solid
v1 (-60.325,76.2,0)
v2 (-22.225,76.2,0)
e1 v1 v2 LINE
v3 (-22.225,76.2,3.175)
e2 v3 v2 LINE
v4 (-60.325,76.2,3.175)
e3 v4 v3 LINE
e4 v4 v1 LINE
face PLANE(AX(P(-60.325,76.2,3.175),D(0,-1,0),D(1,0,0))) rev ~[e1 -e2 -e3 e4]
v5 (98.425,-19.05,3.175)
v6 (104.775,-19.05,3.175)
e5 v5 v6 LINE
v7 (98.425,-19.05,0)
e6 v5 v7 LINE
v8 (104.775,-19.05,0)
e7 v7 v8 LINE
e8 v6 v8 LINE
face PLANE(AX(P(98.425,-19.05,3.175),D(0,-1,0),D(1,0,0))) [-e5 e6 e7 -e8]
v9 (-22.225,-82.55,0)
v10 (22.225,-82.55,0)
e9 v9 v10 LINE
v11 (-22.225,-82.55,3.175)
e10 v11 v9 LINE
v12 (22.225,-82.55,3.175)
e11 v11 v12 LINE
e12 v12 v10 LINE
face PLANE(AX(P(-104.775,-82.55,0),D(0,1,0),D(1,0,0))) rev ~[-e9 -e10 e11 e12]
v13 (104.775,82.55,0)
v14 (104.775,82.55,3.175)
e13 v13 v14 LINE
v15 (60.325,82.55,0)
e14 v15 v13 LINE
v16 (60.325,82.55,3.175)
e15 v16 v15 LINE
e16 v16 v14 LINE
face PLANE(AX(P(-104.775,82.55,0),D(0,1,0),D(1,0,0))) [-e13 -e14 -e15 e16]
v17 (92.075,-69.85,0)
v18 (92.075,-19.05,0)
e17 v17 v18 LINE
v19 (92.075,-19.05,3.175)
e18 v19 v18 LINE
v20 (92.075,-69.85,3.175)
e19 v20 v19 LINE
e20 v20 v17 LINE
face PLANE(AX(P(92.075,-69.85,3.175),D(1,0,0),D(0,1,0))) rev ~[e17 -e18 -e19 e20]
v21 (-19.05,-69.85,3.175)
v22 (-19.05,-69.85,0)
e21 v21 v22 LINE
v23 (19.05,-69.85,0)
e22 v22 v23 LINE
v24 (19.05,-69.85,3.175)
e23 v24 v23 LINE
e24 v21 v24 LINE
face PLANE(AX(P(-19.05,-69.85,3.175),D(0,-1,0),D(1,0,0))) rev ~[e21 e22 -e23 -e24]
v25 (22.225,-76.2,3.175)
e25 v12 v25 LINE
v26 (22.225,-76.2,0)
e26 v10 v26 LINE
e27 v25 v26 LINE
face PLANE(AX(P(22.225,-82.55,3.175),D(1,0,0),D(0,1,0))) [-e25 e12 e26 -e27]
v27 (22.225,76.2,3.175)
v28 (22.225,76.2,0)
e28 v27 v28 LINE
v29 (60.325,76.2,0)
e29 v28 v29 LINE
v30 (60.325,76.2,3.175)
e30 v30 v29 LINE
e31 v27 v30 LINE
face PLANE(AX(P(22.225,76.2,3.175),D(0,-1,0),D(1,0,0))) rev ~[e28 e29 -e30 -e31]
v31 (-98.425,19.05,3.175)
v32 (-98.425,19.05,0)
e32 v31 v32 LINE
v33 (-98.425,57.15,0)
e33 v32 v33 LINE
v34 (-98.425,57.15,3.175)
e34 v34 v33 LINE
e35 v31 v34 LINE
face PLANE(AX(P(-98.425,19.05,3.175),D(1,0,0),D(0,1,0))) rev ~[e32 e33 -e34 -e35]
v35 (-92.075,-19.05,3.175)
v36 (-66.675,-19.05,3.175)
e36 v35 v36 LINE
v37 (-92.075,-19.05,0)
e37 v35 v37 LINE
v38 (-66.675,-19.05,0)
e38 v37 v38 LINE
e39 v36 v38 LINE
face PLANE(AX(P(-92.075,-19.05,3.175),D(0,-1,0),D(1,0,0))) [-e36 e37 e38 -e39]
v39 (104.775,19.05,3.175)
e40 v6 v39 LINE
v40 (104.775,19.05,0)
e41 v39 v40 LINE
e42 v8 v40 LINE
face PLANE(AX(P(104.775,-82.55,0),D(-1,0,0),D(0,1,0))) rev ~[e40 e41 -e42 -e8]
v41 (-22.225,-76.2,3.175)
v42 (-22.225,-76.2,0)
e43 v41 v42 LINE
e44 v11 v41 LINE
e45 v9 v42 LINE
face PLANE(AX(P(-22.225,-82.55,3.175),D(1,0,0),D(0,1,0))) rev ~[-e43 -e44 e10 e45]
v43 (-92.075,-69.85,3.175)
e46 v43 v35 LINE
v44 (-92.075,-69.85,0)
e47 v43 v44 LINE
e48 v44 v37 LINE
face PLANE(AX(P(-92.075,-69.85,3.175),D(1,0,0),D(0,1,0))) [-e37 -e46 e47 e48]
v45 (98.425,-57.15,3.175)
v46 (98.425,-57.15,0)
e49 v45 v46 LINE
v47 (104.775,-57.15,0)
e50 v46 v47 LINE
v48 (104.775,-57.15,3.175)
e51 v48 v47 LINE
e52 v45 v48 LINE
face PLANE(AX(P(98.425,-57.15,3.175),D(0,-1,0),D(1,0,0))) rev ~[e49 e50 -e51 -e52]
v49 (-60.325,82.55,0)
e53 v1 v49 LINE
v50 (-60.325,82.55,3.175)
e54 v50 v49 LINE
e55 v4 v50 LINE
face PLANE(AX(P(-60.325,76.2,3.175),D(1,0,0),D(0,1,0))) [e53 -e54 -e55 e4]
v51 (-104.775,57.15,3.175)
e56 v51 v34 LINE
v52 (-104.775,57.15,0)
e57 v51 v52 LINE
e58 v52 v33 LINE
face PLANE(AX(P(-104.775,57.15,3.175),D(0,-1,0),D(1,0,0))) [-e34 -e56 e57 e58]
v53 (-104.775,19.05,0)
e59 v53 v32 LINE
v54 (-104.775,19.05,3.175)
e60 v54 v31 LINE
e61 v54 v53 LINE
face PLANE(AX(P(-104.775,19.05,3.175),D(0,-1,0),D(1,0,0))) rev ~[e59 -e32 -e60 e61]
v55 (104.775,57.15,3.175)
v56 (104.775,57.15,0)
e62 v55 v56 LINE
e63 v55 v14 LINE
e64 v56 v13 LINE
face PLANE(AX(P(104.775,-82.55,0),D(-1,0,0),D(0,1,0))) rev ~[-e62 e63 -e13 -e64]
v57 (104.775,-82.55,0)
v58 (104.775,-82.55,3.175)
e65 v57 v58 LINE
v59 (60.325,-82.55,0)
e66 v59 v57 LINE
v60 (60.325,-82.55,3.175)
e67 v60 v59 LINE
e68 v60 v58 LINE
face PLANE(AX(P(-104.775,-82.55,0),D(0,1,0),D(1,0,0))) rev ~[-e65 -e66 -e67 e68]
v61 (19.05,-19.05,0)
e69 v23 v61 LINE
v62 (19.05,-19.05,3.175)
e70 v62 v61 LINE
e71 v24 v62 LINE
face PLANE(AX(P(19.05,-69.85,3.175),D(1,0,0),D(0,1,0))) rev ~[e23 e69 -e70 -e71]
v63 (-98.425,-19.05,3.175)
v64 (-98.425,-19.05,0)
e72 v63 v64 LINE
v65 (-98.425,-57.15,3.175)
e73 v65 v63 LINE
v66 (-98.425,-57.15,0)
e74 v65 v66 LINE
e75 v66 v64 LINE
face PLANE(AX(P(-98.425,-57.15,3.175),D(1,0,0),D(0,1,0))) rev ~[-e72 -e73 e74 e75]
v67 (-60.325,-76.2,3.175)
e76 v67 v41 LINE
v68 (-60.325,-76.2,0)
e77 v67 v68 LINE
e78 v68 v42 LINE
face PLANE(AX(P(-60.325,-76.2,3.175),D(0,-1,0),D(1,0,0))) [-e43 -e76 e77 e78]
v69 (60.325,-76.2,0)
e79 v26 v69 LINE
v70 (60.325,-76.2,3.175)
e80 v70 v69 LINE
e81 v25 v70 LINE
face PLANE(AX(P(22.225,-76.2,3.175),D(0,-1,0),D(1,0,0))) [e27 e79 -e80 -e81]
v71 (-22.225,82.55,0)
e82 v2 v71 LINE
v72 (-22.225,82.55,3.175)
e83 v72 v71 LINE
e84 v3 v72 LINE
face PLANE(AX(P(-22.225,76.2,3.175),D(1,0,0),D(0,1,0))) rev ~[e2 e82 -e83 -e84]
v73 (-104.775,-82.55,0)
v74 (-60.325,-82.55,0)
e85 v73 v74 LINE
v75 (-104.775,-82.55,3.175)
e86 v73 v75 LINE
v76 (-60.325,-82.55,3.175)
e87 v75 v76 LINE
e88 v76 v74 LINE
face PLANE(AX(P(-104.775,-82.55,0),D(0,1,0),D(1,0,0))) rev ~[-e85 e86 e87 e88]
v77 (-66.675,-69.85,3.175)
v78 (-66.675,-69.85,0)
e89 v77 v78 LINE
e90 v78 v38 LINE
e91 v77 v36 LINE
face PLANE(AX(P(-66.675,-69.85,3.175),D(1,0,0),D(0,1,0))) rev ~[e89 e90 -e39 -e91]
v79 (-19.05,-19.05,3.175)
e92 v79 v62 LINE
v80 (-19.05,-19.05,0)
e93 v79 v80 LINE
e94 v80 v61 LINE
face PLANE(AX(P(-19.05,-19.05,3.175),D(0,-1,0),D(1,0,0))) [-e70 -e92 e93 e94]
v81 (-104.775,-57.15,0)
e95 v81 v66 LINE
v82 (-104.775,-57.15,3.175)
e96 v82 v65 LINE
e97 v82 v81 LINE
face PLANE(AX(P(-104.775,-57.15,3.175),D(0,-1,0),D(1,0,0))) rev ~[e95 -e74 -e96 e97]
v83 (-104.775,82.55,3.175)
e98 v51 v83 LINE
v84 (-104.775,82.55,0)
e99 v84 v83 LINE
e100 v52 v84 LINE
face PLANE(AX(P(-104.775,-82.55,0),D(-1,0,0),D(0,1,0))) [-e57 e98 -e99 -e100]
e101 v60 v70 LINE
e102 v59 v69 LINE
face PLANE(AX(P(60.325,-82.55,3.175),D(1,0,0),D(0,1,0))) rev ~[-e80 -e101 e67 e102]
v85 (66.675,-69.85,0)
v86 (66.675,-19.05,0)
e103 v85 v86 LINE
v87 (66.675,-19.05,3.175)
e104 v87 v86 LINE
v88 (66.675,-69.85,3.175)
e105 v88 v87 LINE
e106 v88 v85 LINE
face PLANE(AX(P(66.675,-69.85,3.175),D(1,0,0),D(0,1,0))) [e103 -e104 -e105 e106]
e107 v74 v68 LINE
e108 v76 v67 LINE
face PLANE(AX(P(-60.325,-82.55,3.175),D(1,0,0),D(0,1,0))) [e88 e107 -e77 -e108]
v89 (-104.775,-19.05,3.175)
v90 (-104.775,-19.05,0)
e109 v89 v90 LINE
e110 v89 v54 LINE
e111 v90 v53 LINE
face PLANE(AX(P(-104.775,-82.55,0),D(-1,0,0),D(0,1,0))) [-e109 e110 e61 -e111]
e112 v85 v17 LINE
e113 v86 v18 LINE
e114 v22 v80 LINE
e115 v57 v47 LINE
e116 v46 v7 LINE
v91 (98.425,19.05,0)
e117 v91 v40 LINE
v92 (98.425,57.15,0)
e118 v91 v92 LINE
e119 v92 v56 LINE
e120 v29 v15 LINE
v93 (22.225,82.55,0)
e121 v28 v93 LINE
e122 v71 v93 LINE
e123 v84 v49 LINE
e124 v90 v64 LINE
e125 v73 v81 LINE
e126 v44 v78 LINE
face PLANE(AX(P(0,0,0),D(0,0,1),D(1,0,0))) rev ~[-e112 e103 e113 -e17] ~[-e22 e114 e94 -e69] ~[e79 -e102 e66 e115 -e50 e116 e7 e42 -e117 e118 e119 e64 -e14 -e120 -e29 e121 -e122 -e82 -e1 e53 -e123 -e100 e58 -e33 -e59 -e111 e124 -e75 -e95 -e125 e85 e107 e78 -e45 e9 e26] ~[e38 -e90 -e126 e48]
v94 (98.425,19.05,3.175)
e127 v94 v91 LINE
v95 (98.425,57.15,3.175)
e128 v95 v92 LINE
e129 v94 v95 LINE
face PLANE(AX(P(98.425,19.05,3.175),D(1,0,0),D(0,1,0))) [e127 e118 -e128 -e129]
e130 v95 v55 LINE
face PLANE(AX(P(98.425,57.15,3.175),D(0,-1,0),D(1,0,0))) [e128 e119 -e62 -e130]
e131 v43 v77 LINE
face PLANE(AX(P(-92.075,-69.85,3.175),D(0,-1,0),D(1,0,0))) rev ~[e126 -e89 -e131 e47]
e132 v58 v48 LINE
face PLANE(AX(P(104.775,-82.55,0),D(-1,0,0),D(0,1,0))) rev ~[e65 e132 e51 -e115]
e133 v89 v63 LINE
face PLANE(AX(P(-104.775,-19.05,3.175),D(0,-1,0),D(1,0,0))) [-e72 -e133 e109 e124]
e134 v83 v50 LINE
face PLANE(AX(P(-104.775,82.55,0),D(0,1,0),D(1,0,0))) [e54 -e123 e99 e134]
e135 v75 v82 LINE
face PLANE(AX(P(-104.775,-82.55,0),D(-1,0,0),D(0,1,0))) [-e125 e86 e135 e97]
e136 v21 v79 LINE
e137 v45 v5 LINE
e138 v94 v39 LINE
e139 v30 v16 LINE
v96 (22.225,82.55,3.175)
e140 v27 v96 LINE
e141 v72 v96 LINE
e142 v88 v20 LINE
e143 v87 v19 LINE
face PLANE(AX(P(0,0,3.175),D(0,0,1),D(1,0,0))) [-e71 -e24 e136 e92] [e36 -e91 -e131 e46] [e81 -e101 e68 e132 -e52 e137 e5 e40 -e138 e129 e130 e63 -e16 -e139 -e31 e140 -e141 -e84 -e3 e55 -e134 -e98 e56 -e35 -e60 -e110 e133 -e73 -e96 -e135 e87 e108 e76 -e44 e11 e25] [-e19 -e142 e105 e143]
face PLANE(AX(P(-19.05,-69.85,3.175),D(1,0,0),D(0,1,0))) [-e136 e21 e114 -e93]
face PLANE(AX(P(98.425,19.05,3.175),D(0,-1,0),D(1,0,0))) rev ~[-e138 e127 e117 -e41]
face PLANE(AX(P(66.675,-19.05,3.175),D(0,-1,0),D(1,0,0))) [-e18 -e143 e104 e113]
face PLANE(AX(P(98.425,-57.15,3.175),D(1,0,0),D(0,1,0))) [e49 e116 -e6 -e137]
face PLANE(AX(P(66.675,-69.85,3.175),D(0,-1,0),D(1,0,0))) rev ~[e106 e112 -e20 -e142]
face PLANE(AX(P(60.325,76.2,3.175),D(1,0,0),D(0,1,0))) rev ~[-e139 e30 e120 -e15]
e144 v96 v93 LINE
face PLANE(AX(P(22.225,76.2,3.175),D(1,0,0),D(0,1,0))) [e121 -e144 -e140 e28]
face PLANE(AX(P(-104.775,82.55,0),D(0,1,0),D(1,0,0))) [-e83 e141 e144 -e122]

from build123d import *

# Parameters (mm, degrees)
F0_W     = 209.55
F0_H     = 165.1
F1_DEPTH = 3.175
F2_W     = 6.35
F2_H     = 38.1
F2_W_2   = 38.1
F2_H_2   = 6.35
F3_DEPTH = 25.4
F4_W     = 25.4
F4_H     = 50.8
F4_W_2   = 38.1
F5_DEPTH = 25.4


# Not quite as in the source:
# - a length typed as a fraction of an inch, garbled in the dataset ("3 / 203.2 mm" for 3/8 in), is restored


with BuildPart() as f1:
    # F0 (on Top) → F1 (new body)
    with BuildSketch(Plane.XY):
        Rectangle(F0_W, F0_H)
    extrude(amount=F1_DEPTH)

    # F2 (on face) → F3 (cut)
    with BuildSketch(Plane.XY.offset(3.175)):
        with Locations((-101.6, 38.1)):
            Rectangle(F2_W, F2_H)
        with Locations((-101.6, -38.1)):
            Rectangle(F2_W, F2_H)
        with Locations((101.6, 38.1)):
            Rectangle(F2_W, F2_H)
        with Locations((101.6, -38.1)):
            Rectangle(F2_W, F2_H)
        with Locations((-41.275, -79.375)):
            Rectangle(F2_W_2, F2_H_2)
        with Locations((41.275, -79.375)):
            Rectangle(F2_W_2, F2_H_2)
        with Locations((41.275, 79.375)):
            Rectangle(F2_W_2, F2_H_2)
        with Locations((-41.275, 79.375)):
            Rectangle(F2_W_2, F2_H_2)
    extrude(amount=-F3_DEPTH, mode=Mode.SUBTRACT)

    # F4 (on face) → F5 (cut)
    with BuildSketch(Plane.XY.offset(3.175)):
        with Locations((-79.375, -44.45)):
            Rectangle(F4_W, F4_H)
        with Locations((79.375, -44.45)):
            Rectangle(F4_W, F4_H)
        with Locations((0, -44.45)):
            Rectangle(F4_W_2, F4_H)
    extrude(amount=-F5_DEPTH, mode=Mode.SUBTRACT)


solid = f1.part
